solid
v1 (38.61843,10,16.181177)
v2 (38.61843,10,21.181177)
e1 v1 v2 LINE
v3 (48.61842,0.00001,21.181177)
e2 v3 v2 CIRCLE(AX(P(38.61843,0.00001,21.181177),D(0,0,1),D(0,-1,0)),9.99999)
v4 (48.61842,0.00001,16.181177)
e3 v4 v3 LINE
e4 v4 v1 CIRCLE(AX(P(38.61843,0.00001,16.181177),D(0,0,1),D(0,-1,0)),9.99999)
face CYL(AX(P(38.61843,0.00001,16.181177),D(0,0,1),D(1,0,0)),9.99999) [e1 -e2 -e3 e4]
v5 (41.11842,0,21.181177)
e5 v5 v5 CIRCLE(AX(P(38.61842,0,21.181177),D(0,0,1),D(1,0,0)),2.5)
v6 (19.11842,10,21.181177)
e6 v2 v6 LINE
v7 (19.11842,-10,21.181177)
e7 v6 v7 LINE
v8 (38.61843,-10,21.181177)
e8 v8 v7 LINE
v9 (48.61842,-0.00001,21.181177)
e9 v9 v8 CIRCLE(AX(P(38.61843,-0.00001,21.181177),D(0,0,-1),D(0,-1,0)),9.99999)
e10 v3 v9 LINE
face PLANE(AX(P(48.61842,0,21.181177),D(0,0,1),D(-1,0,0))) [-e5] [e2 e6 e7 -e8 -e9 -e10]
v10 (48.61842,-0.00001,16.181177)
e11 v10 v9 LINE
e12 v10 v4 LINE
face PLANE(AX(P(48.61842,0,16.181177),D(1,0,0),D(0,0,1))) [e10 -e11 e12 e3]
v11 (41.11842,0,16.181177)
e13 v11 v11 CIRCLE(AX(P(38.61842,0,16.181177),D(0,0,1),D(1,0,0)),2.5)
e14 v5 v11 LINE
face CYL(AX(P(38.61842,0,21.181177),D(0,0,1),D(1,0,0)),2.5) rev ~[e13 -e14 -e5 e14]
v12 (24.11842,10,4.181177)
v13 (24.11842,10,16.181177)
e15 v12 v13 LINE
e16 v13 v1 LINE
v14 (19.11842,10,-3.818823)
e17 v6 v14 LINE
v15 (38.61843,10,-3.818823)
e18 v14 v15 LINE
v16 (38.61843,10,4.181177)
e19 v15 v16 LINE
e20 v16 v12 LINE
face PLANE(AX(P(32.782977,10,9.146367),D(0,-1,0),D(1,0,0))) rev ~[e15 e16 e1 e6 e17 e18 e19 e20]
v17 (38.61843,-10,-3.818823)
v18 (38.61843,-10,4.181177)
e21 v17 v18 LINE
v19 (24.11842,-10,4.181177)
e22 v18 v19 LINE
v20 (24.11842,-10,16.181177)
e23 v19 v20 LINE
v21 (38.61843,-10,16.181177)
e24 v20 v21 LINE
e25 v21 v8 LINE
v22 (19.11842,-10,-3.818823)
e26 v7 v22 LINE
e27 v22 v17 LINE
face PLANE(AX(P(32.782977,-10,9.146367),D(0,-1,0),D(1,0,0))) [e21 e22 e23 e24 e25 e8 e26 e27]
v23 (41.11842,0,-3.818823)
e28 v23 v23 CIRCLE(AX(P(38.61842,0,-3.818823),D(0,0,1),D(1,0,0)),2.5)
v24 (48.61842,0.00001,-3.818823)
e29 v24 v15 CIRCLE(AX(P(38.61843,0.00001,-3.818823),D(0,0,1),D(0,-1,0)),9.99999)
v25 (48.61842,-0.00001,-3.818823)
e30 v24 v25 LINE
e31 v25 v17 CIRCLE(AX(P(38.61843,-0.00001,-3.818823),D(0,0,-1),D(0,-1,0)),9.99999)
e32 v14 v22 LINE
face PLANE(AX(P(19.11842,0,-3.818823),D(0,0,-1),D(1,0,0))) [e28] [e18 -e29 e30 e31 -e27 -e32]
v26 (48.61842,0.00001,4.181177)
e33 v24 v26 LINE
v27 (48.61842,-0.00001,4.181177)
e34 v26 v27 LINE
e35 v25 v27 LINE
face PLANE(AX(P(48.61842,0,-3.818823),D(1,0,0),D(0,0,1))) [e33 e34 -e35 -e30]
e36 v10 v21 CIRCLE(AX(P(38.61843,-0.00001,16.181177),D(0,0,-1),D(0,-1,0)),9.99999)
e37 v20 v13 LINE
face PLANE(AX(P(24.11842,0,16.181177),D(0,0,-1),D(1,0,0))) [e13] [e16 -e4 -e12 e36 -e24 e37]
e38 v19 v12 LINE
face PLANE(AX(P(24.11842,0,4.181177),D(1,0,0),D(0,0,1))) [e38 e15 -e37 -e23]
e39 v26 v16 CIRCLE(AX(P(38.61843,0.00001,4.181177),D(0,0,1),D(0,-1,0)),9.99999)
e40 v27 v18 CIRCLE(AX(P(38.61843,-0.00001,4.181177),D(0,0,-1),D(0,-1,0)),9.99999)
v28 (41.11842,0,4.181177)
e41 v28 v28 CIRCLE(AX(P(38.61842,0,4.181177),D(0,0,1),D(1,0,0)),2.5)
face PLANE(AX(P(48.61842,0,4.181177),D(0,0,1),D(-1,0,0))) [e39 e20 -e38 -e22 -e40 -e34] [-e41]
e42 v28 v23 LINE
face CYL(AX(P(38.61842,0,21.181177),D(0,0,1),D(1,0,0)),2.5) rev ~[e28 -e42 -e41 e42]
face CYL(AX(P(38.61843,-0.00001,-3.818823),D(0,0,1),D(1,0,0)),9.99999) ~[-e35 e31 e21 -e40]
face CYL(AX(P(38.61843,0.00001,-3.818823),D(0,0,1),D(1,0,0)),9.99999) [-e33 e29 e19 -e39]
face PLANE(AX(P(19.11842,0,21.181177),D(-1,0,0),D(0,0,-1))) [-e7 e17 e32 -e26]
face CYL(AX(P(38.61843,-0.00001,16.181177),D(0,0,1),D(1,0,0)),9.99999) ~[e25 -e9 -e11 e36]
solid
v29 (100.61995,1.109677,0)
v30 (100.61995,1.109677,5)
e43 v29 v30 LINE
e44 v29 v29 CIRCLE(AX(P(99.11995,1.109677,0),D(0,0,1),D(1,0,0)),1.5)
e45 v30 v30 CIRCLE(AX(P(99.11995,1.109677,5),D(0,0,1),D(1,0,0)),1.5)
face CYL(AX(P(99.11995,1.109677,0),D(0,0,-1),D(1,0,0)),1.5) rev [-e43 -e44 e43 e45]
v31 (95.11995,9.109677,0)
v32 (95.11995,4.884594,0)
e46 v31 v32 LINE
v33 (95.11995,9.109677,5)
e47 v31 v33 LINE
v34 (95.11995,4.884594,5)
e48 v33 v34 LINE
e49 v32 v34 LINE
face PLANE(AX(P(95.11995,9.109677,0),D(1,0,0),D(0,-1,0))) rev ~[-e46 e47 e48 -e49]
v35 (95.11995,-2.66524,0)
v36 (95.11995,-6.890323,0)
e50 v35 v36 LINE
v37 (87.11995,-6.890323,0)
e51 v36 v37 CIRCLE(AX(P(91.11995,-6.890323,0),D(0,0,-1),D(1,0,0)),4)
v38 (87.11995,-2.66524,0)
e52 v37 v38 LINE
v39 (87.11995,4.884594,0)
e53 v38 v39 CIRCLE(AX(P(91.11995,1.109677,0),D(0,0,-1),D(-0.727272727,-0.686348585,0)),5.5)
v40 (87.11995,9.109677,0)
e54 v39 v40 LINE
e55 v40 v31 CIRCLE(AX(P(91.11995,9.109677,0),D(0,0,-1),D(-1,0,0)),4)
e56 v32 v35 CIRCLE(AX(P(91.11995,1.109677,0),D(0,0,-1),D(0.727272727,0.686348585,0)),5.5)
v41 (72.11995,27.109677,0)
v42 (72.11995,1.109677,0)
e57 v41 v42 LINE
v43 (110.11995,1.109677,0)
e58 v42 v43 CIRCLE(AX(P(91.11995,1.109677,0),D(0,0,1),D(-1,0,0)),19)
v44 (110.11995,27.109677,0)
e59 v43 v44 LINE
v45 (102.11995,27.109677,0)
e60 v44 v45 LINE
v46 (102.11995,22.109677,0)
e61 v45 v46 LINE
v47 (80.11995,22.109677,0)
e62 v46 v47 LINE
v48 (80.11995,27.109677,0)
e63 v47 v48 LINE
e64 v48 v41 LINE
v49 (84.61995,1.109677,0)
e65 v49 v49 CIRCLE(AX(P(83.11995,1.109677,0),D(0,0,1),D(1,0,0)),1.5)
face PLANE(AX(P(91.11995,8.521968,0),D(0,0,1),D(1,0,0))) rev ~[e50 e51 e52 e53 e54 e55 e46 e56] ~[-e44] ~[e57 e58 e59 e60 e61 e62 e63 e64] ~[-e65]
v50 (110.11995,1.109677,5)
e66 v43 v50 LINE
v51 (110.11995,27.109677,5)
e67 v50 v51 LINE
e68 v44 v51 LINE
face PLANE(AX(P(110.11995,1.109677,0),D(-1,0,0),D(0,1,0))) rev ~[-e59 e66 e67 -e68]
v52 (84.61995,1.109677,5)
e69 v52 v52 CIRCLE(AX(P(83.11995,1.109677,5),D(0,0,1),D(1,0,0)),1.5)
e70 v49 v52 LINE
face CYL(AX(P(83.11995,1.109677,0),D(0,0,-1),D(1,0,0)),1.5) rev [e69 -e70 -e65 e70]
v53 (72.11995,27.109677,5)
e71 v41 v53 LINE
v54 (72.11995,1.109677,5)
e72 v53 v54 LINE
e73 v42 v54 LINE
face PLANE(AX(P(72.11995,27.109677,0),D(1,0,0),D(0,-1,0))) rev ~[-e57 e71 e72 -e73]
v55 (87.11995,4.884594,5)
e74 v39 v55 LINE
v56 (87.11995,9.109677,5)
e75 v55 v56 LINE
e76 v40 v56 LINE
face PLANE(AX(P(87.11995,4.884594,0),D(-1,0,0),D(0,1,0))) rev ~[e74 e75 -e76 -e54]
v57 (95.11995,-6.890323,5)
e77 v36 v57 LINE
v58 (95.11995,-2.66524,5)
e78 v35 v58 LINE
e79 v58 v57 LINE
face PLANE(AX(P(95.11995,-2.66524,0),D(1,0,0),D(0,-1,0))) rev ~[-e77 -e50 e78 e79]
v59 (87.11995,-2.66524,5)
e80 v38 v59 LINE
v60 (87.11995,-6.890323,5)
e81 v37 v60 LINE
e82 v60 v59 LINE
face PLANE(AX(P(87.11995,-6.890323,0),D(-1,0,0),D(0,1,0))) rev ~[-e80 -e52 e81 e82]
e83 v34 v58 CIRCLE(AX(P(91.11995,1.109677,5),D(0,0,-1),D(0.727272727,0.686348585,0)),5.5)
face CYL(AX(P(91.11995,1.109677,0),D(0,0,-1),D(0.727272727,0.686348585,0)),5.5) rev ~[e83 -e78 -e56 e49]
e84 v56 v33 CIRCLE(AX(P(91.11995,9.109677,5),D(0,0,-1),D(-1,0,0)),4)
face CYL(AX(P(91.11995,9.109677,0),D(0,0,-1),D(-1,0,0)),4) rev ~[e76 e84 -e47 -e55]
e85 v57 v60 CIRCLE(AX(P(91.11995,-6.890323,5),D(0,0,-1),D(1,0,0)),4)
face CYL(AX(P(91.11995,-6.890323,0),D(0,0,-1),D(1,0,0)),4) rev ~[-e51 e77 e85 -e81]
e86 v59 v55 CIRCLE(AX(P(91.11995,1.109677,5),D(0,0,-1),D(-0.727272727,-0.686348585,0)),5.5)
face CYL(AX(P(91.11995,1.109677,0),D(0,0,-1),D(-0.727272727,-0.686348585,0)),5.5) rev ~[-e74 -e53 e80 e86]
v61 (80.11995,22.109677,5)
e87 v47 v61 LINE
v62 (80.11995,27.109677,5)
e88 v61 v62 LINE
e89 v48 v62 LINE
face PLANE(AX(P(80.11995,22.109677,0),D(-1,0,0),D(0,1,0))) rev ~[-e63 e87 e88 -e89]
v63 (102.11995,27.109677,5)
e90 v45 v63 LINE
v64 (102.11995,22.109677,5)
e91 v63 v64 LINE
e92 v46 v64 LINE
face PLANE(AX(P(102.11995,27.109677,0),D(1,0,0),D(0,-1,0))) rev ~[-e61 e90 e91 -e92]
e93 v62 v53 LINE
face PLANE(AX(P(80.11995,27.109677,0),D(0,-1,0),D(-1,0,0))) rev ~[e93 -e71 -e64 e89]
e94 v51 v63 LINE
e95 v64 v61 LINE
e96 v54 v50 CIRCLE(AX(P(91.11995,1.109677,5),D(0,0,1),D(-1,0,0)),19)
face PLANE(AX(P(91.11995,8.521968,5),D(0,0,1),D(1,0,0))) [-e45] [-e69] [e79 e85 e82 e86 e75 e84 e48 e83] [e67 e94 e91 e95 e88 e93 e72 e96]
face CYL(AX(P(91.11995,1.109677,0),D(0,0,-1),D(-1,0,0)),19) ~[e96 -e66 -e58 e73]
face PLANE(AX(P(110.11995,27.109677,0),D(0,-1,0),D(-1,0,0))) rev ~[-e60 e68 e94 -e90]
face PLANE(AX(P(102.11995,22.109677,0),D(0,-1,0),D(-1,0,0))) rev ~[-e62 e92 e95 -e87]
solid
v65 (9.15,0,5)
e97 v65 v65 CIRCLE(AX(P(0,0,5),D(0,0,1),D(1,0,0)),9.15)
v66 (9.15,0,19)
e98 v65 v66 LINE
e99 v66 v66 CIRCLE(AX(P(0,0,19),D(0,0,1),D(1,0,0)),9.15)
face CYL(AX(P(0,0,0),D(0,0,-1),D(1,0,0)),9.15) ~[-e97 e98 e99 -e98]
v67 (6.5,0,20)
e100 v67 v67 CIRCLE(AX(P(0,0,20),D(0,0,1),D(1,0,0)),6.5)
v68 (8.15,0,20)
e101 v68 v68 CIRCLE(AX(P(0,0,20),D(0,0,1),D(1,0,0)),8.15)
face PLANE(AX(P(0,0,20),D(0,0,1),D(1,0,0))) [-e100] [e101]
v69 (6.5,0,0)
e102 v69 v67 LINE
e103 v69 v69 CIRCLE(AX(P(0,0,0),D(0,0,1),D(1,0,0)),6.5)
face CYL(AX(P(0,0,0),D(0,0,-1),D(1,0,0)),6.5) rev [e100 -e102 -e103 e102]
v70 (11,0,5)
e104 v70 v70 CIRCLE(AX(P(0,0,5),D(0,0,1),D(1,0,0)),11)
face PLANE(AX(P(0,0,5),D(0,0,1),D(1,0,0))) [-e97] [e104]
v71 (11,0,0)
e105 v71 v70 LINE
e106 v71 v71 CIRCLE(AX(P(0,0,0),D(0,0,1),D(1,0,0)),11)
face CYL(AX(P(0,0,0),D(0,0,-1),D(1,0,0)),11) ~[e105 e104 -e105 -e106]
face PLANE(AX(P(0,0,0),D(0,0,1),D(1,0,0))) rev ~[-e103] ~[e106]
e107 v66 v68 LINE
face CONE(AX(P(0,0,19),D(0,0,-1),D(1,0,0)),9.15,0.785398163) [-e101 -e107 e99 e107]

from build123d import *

# Parameters (mm, degrees)
F0_R      = 9.15
F0_R_2    = 6.5
F1_DEPTH  = 20
F0_R_3    = 11
F2_DEPTH  = 5
F3_SIZE   = 1
F5_DEPTH  = 10
F6_R      = 9.99999
F7_R      = 2.5
F8_DEPTH  = 25.001
F9_R      = 1.5
F10_DEPTH = 5


# Not quite as in the source:
# - a fillet or chamfer is up to 0.001 mm smaller than in the source, because OpenCascade refuses the exact size


with BuildPart() as f1:
    # F0 (on Top) → F1 (new body)
    with BuildSketch(Plane.XY):
        Circle(F0_R)
        Circle(F0_R_2, mode=Mode.SUBTRACT)
    extrude(amount=F1_DEPTH)

    # F0 (on Top) → F2 (join)
    with BuildSketch(Plane.XY):
        Circle(F0_R_3)
        Circle(F0_R, mode=Mode.SUBTRACT)
    extrude(amount=F2_DEPTH)

    # F3
    f3_edges = [f1.edges().sort_by_distance(p)[0] for p in [
        (-9.15, 0, 20),
    ]]
    chamfer(f3_edges, length=F3_SIZE)


with BuildPart() as f5:
    # F4 (on Front) → F5 (new body, symmetric)
    with BuildSketch(Plane.XZ):
        Polygon((48.6184198422, 16.1811771655), (48.6184198422, 21.1811771655), (19.1184198422, 21.1811771655), (19.1184198422, -3.8188228345), (48.6184198422, -3.8188228345), (48.6184198422, 4.1811771655), (24.1184198422, 4.1811771655), (24.1184198422, 16.1811771655), align=None)
    extrude(amount=F5_DEPTH, both=True)

    # F6 (radius 10 in the source; OpenCascade refuses exactly that, so slightly less here)
    f6_edges = [f5.edges().sort_by_distance(p)[0] for p in [
        (48.61842, -10, 18.681177),
        (48.61842, 10, 18.681177),
        (48.61842, 10, 0.181177),
        (48.61842, -10, 0.181177),
    ]]
    fillet(f6_edges, radius=F6_R)

    # F7 (on face) → F8 (cut, through all)
    with BuildSketch(Plane.XY.offset(21.1811771655)):
        with Locations((38.6184198422, 0)):
            Circle(F7_R)
    extrude(amount=-F8_DEPTH, mode=Mode.SUBTRACT)


with BuildPart() as f10:
    # F9 (on Top) → F10 (new body)
    with BuildSketch(Plane.XY):
        with BuildLine():
            Line((72.1199496662, 27.1096767731), (72.1199496662, 1.1096767731))
            ThreePointArc((72.1199496662, 1.1096767731), (91.1199496662, -17.8903232269), (110.1199496662, 1.1096767731))
            Line((110.1199496662, 1.1096767731), (110.1199496662, 27.1096767731))
            Line((110.1199496662, 27.1096767731), (102.1199496662, 27.1096767731))
            Line((102.1199496662, 27.1096767731), (102.1199496662, 22.1096767731))
            Line((102.1199496662, 22.1096767731), (80.1199496662, 22.1096767731))
            Line((80.1199496662, 22.1096767731), (80.1199496662, 27.1096767731))
            Line((80.1199496662, 27.1096767731), (72.1199496662, 27.1096767731))
        make_face()
        with Locations((83.1199496662, 1.1096767731)):
            Circle(F9_R, mode=Mode.SUBTRACT)
        with BuildLine():
            ThreePointArc((87.1199496662, -2.6652404445), (85.6199496662, 1.1096767731), (87.1199496662, 4.8845939907))
            Line((87.1199496662, 4.8845939907), (87.1199496662, 9.1096767731))
            ThreePointArc((87.1199496662, 9.1096767731), (91.1199496662, 13.1096767731), (95.1199496662, 9.1096767731))
            Line((95.1199496662, 9.1096767731), (95.1199496662, 4.8845939907))
            ThreePointArc((95.1199496662, 4.8845939907), (96.6199496662, 1.1096767731), (95.1199496662, -2.6652404445))
            Line((95.1199496662, -2.6652404445), (95.1199496662, -6.8903232269))
            ThreePointArc((95.1199496662, -6.8903232269), (91.1199496662, -10.8903232269), (87.1199496662, -6.8903232269))
            Line((87.1199496662, -6.8903232269), (87.1199496662, -2.6652404445))
        make_face(mode=Mode.SUBTRACT)
        with Locations((99.1199496662, 1.1096767731)):
            Circle(F9_R, mode=Mode.SUBTRACT)
    extrude(amount=F10_DEPTH)


solid = Compound([f1.part, f5.part, f10.part])
